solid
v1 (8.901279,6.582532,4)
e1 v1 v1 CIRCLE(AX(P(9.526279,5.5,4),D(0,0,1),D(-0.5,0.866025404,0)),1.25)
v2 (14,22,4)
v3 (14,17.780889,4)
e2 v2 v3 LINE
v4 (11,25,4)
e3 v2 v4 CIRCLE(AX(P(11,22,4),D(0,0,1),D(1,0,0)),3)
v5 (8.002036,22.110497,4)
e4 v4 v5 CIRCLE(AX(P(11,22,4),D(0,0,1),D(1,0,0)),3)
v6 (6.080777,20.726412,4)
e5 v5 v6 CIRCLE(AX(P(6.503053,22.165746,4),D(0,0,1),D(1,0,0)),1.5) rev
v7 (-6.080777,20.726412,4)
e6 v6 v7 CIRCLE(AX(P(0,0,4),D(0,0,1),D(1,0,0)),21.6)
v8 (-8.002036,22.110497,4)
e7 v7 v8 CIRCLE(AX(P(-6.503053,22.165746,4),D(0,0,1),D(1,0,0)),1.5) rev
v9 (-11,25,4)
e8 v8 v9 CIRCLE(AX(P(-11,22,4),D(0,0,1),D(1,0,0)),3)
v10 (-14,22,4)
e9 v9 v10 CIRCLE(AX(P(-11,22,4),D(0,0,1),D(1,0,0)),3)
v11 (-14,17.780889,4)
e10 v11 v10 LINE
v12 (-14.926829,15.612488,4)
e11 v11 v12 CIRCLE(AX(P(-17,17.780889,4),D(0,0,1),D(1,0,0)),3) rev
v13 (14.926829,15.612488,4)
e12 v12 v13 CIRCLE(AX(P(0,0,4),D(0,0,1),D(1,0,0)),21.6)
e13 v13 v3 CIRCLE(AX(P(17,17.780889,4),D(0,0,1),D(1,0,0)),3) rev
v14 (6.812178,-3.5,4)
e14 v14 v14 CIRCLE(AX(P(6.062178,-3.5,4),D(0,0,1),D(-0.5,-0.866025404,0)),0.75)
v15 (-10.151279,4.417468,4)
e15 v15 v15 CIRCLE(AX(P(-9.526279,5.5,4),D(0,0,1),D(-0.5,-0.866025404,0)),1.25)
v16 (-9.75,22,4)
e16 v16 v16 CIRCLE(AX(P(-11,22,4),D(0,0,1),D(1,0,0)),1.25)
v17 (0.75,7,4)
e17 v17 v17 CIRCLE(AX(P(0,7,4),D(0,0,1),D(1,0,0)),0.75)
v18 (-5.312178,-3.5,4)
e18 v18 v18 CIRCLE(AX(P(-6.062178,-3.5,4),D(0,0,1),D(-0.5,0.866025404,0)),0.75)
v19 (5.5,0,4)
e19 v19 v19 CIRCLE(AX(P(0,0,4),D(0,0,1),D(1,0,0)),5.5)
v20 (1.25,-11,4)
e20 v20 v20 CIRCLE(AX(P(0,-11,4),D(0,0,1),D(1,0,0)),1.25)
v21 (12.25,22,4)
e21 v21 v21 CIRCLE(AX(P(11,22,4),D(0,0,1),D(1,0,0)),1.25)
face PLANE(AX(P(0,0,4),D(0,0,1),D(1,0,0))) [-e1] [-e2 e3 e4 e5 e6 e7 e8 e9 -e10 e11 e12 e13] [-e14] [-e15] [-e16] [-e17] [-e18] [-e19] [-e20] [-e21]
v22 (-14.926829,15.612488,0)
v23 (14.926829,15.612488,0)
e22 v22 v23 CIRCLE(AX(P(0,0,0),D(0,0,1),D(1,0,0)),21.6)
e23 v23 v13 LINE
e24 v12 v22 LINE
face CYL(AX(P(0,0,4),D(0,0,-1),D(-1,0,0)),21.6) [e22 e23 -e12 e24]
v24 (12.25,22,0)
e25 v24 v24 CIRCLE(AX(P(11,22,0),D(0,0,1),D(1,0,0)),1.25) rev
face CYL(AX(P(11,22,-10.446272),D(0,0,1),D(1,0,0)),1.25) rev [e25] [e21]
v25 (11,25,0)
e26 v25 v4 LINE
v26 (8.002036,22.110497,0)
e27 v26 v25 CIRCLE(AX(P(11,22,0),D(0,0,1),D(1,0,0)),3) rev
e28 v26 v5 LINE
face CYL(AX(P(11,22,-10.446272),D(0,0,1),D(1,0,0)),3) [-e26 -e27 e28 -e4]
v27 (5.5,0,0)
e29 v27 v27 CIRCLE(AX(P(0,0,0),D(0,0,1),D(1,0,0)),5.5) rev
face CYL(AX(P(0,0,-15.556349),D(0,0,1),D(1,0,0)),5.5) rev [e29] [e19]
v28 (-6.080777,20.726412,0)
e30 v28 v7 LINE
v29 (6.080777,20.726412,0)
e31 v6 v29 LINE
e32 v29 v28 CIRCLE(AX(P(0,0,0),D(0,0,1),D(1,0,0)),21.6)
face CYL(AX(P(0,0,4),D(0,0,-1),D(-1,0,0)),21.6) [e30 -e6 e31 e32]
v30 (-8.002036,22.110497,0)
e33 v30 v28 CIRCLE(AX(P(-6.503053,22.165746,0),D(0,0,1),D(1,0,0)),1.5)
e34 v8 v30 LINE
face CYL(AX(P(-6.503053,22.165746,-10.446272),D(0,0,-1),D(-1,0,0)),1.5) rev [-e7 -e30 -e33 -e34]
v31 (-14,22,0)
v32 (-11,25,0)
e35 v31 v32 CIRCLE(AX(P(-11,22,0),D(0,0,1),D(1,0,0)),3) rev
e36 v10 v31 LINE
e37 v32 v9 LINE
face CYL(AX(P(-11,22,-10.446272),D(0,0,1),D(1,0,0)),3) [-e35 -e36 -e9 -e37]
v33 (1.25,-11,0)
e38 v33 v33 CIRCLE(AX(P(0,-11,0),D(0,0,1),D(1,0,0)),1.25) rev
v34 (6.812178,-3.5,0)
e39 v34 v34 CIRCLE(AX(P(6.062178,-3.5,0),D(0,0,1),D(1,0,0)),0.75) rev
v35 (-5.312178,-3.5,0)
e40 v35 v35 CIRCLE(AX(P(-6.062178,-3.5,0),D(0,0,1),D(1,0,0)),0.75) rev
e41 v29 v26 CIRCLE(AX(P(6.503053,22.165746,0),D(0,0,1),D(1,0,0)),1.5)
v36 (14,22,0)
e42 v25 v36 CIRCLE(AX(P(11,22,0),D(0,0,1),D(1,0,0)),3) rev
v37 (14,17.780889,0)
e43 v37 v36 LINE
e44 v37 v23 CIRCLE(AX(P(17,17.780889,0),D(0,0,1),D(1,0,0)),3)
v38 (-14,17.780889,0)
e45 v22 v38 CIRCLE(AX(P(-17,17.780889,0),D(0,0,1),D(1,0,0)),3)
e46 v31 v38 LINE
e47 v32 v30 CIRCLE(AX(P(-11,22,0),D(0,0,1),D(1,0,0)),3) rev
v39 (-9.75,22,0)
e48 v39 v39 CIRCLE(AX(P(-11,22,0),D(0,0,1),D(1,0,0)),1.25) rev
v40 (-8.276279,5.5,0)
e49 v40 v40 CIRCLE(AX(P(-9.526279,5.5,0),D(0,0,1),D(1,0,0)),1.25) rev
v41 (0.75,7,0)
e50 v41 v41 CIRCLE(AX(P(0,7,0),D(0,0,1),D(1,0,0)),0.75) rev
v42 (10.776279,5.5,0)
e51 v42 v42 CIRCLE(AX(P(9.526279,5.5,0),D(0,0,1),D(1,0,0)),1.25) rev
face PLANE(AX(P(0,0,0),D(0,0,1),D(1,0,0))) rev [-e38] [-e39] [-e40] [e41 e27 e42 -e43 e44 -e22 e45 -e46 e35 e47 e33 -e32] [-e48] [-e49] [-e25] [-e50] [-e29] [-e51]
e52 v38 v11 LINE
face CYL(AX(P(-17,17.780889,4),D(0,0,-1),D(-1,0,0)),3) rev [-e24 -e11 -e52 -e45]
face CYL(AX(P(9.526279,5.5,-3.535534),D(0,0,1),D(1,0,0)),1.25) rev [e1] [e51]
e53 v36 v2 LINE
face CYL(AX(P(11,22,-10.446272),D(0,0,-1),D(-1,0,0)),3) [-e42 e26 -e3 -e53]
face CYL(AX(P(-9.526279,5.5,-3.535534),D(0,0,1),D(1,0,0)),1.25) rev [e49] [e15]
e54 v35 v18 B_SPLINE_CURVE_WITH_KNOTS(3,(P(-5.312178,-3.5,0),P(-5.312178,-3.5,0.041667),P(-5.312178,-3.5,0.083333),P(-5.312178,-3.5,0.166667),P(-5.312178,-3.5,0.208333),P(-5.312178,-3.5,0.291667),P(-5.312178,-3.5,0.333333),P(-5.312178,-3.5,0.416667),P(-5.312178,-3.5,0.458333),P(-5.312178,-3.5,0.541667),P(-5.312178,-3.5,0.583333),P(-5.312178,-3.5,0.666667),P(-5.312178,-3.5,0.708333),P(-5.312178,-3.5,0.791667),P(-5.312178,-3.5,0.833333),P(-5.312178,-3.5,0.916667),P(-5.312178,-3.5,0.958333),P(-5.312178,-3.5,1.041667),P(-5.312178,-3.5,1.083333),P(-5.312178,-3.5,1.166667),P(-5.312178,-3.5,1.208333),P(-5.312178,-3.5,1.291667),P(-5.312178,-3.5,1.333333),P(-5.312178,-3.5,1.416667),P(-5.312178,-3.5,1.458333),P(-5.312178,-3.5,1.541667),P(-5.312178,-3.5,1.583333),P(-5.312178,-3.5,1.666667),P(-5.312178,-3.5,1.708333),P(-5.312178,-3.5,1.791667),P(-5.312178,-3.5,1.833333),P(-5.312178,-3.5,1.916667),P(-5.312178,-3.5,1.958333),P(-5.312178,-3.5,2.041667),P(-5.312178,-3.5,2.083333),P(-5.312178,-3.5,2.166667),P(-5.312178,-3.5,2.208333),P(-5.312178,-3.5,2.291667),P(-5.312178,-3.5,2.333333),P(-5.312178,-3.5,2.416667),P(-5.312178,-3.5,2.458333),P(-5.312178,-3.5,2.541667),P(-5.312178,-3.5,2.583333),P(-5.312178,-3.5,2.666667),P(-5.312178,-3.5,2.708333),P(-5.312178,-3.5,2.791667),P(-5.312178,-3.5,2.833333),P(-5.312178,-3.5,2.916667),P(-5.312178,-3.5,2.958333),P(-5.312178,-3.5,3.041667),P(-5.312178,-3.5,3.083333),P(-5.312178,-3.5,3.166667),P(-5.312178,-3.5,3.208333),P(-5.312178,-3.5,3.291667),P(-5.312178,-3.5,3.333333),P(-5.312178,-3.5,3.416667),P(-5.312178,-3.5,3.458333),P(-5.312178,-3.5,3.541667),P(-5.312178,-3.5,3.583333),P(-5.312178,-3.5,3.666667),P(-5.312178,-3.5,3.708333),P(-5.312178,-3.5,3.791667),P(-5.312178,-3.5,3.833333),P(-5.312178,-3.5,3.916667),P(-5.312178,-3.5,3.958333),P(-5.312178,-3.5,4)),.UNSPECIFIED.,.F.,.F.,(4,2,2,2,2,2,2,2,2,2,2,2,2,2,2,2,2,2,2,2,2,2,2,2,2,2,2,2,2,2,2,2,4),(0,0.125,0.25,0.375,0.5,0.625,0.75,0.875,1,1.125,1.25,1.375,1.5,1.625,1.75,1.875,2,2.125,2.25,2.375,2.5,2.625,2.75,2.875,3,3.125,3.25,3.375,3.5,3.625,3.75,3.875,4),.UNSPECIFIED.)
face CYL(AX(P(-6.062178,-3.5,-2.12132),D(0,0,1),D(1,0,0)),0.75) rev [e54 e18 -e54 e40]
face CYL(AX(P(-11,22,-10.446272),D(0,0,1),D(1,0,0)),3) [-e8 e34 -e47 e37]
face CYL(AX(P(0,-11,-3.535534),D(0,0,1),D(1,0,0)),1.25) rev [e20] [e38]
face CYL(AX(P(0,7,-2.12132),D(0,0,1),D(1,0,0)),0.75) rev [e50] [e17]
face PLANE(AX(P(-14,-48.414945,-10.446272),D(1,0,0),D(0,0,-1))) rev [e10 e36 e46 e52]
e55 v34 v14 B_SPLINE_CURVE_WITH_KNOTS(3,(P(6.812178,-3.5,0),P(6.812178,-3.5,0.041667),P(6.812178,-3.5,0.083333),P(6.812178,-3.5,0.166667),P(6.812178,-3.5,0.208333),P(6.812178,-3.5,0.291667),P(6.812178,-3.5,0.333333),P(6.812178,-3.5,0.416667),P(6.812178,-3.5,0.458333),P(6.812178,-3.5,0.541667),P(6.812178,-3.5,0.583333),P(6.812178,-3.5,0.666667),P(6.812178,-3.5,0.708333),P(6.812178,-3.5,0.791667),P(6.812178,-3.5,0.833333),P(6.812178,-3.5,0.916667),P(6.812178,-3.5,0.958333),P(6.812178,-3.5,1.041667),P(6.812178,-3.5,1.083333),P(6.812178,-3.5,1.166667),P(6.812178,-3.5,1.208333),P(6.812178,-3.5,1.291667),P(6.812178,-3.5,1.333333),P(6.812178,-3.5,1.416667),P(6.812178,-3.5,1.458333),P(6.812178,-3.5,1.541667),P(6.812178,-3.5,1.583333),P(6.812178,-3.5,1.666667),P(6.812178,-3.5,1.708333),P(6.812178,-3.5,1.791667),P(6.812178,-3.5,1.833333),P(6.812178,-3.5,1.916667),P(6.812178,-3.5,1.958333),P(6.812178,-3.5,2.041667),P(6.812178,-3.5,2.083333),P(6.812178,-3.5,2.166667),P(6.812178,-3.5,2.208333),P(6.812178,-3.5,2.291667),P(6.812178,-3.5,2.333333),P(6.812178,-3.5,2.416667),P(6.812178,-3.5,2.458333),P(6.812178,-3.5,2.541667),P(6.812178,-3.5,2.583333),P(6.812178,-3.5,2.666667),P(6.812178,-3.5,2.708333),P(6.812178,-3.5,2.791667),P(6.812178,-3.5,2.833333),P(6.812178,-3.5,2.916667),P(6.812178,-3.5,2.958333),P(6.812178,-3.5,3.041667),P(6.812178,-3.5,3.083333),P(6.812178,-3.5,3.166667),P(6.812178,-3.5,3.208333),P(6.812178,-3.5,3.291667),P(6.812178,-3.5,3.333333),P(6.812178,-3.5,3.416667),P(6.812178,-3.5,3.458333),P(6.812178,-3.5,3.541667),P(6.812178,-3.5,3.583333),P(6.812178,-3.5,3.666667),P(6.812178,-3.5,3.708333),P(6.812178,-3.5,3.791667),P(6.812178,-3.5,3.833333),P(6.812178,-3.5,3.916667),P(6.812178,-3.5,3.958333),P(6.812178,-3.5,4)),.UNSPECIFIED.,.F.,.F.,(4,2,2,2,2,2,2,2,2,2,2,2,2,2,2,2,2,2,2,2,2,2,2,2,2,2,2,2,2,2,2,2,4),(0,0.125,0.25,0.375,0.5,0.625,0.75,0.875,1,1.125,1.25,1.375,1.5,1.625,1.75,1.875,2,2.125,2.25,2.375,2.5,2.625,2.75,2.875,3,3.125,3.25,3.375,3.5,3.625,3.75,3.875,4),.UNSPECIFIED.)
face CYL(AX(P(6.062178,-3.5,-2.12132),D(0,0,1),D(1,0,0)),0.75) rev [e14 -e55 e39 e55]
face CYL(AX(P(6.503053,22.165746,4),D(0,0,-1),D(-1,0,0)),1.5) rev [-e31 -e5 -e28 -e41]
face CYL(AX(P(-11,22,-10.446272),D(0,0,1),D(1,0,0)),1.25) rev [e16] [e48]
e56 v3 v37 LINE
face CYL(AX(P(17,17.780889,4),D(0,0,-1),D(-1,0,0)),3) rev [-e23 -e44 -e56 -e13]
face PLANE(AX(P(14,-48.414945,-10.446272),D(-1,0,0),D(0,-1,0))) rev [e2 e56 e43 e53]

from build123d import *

# Parameters (mm, degrees)
SKETCH1_R         = 21.6
EXTRUDE1_DEPTH    = 4
EXTRUDE2_START    = -4
SKETCH2_R         = 1.25
EXTRUDE2_DEPTH    = 4
FILLET1_R         = 3
FILLET2_R         = 1.5
SKETCH3_R         = 5.5
EXTRUDE3_DEPTH    = 4
SKETCH4_R         = 0.75
EXTRUDE4_DEPTH    = 4
CIRPATTERN1_COUNT = 3
SKETCH5_R         = 1.25
EXTRUDE5_DEPTH    = 4
CIRPATTERN2_COUNT = 3


with BuildPart() as part:
    # Sketch1 → Extrude1 (new body)
    with BuildSketch(Plane.XY):
        Circle(SKETCH1_R)
    extrude(amount=EXTRUDE1_DEPTH)

    # Sketch2 → Extrude2 (add)
    # profile 1 of 2: a face of its own
    with BuildSketch(Plane.XY.offset(4).offset(EXTRUDE2_START)):
        with BuildLine():
            Line((8, 25), (8, 20.063897926))
            ThreePointArc((8, 20.063897926), (11.147528841, 18.501151335), (14, 16.448708156))
            Line((14, 16.448708156), (14, 25))
            Line((14, 25), (8, 25))
        make_face()
        with Locations((11, 22)):
            Circle(SKETCH2_R, mode=Mode.SUBTRACT)
    # profile 2 of 2: a face of its own
    with BuildSketch(Plane.XY.offset(4).offset(EXTRUDE2_START)):
        with BuildLine():
            Line((-14, 25), (-14, 16.448708156))
            ThreePointArc((-14, 16.448708156), (-11.147528841, 18.501151335), (-8, 20.063897926))
            Line((-8, 20.063897926), (-8, 25))
            Line((-8, 25), (-14, 25))
        make_face()
        with Locations((-11, 22)):
            Circle(SKETCH2_R, mode=Mode.SUBTRACT)
    extrude(amount=EXTRUDE2_DEPTH)

    # Fillet1
    fillet1_edges = [part.edges().sort_by_distance(p)[0] for p in [
        (14, 16.448708156, 2),
        (-14, 16.448708156, 2),
        (14, 25, 2),
        (8, 25, 2),
        (-8, 25, 2),
        (-14, 25, 2),
    ]]
    fillet(fillet1_edges, radius=FILLET1_R - 0.0001)  # a hair under: the kernel refuses the full size

    # Fillet2
    fillet2_edges = [part.edges().sort_by_distance(p)[0] for p in [
        (8, 20.063897926, 2),
        (-8, 20.063897926, 2),
    ]]
    fillet(fillet2_edges, radius=FILLET2_R)

    # Sketch3 → Extrude3 (cut)
    with BuildSketch(Plane.XY.offset(4)):
        Circle(SKETCH3_R)
    extrude(amount=-EXTRUDE3_DEPTH, mode=Mode.SUBTRACT)

    # Sketch4 → Extrude4 (cut)
    with BuildSketch(Plane.XY.offset(4)):
        with Locations((0, 7)):
            Circle(SKETCH4_R)
    extrude4 = extrude(amount=-EXTRUDE4_DEPTH, mode=Mode.SUBTRACT)

    # CirPattern1: Extrude4 ×3 about axis
    cirpattern1_axis = Axis((0, 0, 0), (0, 0, 1))
    for i in range(1, CIRPATTERN1_COUNT):
        add(extrude4.rotate(cirpattern1_axis, i * 360 / CIRPATTERN1_COUNT), mode=Mode.SUBTRACT)

    # Sketch5 → Extrude5 (cut)
    with BuildSketch(Plane.XY.offset(4)):
        with Locations((0, -11)):
            Circle(SKETCH5_R)
    extrude5 = extrude(amount=-EXTRUDE5_DEPTH, mode=Mode.SUBTRACT)

    # CirPattern2: Extrude5 ×3 about axis
    cirpattern2_axis = Axis((0, 0, 0), (0, 0, 1))
    for i in range(1, CIRPATTERN2_COUNT):
        add(extrude5.rotate(cirpattern2_axis, i * 360 / CIRPATTERN2_COUNT), mode=Mode.SUBTRACT)


solid = part.part
